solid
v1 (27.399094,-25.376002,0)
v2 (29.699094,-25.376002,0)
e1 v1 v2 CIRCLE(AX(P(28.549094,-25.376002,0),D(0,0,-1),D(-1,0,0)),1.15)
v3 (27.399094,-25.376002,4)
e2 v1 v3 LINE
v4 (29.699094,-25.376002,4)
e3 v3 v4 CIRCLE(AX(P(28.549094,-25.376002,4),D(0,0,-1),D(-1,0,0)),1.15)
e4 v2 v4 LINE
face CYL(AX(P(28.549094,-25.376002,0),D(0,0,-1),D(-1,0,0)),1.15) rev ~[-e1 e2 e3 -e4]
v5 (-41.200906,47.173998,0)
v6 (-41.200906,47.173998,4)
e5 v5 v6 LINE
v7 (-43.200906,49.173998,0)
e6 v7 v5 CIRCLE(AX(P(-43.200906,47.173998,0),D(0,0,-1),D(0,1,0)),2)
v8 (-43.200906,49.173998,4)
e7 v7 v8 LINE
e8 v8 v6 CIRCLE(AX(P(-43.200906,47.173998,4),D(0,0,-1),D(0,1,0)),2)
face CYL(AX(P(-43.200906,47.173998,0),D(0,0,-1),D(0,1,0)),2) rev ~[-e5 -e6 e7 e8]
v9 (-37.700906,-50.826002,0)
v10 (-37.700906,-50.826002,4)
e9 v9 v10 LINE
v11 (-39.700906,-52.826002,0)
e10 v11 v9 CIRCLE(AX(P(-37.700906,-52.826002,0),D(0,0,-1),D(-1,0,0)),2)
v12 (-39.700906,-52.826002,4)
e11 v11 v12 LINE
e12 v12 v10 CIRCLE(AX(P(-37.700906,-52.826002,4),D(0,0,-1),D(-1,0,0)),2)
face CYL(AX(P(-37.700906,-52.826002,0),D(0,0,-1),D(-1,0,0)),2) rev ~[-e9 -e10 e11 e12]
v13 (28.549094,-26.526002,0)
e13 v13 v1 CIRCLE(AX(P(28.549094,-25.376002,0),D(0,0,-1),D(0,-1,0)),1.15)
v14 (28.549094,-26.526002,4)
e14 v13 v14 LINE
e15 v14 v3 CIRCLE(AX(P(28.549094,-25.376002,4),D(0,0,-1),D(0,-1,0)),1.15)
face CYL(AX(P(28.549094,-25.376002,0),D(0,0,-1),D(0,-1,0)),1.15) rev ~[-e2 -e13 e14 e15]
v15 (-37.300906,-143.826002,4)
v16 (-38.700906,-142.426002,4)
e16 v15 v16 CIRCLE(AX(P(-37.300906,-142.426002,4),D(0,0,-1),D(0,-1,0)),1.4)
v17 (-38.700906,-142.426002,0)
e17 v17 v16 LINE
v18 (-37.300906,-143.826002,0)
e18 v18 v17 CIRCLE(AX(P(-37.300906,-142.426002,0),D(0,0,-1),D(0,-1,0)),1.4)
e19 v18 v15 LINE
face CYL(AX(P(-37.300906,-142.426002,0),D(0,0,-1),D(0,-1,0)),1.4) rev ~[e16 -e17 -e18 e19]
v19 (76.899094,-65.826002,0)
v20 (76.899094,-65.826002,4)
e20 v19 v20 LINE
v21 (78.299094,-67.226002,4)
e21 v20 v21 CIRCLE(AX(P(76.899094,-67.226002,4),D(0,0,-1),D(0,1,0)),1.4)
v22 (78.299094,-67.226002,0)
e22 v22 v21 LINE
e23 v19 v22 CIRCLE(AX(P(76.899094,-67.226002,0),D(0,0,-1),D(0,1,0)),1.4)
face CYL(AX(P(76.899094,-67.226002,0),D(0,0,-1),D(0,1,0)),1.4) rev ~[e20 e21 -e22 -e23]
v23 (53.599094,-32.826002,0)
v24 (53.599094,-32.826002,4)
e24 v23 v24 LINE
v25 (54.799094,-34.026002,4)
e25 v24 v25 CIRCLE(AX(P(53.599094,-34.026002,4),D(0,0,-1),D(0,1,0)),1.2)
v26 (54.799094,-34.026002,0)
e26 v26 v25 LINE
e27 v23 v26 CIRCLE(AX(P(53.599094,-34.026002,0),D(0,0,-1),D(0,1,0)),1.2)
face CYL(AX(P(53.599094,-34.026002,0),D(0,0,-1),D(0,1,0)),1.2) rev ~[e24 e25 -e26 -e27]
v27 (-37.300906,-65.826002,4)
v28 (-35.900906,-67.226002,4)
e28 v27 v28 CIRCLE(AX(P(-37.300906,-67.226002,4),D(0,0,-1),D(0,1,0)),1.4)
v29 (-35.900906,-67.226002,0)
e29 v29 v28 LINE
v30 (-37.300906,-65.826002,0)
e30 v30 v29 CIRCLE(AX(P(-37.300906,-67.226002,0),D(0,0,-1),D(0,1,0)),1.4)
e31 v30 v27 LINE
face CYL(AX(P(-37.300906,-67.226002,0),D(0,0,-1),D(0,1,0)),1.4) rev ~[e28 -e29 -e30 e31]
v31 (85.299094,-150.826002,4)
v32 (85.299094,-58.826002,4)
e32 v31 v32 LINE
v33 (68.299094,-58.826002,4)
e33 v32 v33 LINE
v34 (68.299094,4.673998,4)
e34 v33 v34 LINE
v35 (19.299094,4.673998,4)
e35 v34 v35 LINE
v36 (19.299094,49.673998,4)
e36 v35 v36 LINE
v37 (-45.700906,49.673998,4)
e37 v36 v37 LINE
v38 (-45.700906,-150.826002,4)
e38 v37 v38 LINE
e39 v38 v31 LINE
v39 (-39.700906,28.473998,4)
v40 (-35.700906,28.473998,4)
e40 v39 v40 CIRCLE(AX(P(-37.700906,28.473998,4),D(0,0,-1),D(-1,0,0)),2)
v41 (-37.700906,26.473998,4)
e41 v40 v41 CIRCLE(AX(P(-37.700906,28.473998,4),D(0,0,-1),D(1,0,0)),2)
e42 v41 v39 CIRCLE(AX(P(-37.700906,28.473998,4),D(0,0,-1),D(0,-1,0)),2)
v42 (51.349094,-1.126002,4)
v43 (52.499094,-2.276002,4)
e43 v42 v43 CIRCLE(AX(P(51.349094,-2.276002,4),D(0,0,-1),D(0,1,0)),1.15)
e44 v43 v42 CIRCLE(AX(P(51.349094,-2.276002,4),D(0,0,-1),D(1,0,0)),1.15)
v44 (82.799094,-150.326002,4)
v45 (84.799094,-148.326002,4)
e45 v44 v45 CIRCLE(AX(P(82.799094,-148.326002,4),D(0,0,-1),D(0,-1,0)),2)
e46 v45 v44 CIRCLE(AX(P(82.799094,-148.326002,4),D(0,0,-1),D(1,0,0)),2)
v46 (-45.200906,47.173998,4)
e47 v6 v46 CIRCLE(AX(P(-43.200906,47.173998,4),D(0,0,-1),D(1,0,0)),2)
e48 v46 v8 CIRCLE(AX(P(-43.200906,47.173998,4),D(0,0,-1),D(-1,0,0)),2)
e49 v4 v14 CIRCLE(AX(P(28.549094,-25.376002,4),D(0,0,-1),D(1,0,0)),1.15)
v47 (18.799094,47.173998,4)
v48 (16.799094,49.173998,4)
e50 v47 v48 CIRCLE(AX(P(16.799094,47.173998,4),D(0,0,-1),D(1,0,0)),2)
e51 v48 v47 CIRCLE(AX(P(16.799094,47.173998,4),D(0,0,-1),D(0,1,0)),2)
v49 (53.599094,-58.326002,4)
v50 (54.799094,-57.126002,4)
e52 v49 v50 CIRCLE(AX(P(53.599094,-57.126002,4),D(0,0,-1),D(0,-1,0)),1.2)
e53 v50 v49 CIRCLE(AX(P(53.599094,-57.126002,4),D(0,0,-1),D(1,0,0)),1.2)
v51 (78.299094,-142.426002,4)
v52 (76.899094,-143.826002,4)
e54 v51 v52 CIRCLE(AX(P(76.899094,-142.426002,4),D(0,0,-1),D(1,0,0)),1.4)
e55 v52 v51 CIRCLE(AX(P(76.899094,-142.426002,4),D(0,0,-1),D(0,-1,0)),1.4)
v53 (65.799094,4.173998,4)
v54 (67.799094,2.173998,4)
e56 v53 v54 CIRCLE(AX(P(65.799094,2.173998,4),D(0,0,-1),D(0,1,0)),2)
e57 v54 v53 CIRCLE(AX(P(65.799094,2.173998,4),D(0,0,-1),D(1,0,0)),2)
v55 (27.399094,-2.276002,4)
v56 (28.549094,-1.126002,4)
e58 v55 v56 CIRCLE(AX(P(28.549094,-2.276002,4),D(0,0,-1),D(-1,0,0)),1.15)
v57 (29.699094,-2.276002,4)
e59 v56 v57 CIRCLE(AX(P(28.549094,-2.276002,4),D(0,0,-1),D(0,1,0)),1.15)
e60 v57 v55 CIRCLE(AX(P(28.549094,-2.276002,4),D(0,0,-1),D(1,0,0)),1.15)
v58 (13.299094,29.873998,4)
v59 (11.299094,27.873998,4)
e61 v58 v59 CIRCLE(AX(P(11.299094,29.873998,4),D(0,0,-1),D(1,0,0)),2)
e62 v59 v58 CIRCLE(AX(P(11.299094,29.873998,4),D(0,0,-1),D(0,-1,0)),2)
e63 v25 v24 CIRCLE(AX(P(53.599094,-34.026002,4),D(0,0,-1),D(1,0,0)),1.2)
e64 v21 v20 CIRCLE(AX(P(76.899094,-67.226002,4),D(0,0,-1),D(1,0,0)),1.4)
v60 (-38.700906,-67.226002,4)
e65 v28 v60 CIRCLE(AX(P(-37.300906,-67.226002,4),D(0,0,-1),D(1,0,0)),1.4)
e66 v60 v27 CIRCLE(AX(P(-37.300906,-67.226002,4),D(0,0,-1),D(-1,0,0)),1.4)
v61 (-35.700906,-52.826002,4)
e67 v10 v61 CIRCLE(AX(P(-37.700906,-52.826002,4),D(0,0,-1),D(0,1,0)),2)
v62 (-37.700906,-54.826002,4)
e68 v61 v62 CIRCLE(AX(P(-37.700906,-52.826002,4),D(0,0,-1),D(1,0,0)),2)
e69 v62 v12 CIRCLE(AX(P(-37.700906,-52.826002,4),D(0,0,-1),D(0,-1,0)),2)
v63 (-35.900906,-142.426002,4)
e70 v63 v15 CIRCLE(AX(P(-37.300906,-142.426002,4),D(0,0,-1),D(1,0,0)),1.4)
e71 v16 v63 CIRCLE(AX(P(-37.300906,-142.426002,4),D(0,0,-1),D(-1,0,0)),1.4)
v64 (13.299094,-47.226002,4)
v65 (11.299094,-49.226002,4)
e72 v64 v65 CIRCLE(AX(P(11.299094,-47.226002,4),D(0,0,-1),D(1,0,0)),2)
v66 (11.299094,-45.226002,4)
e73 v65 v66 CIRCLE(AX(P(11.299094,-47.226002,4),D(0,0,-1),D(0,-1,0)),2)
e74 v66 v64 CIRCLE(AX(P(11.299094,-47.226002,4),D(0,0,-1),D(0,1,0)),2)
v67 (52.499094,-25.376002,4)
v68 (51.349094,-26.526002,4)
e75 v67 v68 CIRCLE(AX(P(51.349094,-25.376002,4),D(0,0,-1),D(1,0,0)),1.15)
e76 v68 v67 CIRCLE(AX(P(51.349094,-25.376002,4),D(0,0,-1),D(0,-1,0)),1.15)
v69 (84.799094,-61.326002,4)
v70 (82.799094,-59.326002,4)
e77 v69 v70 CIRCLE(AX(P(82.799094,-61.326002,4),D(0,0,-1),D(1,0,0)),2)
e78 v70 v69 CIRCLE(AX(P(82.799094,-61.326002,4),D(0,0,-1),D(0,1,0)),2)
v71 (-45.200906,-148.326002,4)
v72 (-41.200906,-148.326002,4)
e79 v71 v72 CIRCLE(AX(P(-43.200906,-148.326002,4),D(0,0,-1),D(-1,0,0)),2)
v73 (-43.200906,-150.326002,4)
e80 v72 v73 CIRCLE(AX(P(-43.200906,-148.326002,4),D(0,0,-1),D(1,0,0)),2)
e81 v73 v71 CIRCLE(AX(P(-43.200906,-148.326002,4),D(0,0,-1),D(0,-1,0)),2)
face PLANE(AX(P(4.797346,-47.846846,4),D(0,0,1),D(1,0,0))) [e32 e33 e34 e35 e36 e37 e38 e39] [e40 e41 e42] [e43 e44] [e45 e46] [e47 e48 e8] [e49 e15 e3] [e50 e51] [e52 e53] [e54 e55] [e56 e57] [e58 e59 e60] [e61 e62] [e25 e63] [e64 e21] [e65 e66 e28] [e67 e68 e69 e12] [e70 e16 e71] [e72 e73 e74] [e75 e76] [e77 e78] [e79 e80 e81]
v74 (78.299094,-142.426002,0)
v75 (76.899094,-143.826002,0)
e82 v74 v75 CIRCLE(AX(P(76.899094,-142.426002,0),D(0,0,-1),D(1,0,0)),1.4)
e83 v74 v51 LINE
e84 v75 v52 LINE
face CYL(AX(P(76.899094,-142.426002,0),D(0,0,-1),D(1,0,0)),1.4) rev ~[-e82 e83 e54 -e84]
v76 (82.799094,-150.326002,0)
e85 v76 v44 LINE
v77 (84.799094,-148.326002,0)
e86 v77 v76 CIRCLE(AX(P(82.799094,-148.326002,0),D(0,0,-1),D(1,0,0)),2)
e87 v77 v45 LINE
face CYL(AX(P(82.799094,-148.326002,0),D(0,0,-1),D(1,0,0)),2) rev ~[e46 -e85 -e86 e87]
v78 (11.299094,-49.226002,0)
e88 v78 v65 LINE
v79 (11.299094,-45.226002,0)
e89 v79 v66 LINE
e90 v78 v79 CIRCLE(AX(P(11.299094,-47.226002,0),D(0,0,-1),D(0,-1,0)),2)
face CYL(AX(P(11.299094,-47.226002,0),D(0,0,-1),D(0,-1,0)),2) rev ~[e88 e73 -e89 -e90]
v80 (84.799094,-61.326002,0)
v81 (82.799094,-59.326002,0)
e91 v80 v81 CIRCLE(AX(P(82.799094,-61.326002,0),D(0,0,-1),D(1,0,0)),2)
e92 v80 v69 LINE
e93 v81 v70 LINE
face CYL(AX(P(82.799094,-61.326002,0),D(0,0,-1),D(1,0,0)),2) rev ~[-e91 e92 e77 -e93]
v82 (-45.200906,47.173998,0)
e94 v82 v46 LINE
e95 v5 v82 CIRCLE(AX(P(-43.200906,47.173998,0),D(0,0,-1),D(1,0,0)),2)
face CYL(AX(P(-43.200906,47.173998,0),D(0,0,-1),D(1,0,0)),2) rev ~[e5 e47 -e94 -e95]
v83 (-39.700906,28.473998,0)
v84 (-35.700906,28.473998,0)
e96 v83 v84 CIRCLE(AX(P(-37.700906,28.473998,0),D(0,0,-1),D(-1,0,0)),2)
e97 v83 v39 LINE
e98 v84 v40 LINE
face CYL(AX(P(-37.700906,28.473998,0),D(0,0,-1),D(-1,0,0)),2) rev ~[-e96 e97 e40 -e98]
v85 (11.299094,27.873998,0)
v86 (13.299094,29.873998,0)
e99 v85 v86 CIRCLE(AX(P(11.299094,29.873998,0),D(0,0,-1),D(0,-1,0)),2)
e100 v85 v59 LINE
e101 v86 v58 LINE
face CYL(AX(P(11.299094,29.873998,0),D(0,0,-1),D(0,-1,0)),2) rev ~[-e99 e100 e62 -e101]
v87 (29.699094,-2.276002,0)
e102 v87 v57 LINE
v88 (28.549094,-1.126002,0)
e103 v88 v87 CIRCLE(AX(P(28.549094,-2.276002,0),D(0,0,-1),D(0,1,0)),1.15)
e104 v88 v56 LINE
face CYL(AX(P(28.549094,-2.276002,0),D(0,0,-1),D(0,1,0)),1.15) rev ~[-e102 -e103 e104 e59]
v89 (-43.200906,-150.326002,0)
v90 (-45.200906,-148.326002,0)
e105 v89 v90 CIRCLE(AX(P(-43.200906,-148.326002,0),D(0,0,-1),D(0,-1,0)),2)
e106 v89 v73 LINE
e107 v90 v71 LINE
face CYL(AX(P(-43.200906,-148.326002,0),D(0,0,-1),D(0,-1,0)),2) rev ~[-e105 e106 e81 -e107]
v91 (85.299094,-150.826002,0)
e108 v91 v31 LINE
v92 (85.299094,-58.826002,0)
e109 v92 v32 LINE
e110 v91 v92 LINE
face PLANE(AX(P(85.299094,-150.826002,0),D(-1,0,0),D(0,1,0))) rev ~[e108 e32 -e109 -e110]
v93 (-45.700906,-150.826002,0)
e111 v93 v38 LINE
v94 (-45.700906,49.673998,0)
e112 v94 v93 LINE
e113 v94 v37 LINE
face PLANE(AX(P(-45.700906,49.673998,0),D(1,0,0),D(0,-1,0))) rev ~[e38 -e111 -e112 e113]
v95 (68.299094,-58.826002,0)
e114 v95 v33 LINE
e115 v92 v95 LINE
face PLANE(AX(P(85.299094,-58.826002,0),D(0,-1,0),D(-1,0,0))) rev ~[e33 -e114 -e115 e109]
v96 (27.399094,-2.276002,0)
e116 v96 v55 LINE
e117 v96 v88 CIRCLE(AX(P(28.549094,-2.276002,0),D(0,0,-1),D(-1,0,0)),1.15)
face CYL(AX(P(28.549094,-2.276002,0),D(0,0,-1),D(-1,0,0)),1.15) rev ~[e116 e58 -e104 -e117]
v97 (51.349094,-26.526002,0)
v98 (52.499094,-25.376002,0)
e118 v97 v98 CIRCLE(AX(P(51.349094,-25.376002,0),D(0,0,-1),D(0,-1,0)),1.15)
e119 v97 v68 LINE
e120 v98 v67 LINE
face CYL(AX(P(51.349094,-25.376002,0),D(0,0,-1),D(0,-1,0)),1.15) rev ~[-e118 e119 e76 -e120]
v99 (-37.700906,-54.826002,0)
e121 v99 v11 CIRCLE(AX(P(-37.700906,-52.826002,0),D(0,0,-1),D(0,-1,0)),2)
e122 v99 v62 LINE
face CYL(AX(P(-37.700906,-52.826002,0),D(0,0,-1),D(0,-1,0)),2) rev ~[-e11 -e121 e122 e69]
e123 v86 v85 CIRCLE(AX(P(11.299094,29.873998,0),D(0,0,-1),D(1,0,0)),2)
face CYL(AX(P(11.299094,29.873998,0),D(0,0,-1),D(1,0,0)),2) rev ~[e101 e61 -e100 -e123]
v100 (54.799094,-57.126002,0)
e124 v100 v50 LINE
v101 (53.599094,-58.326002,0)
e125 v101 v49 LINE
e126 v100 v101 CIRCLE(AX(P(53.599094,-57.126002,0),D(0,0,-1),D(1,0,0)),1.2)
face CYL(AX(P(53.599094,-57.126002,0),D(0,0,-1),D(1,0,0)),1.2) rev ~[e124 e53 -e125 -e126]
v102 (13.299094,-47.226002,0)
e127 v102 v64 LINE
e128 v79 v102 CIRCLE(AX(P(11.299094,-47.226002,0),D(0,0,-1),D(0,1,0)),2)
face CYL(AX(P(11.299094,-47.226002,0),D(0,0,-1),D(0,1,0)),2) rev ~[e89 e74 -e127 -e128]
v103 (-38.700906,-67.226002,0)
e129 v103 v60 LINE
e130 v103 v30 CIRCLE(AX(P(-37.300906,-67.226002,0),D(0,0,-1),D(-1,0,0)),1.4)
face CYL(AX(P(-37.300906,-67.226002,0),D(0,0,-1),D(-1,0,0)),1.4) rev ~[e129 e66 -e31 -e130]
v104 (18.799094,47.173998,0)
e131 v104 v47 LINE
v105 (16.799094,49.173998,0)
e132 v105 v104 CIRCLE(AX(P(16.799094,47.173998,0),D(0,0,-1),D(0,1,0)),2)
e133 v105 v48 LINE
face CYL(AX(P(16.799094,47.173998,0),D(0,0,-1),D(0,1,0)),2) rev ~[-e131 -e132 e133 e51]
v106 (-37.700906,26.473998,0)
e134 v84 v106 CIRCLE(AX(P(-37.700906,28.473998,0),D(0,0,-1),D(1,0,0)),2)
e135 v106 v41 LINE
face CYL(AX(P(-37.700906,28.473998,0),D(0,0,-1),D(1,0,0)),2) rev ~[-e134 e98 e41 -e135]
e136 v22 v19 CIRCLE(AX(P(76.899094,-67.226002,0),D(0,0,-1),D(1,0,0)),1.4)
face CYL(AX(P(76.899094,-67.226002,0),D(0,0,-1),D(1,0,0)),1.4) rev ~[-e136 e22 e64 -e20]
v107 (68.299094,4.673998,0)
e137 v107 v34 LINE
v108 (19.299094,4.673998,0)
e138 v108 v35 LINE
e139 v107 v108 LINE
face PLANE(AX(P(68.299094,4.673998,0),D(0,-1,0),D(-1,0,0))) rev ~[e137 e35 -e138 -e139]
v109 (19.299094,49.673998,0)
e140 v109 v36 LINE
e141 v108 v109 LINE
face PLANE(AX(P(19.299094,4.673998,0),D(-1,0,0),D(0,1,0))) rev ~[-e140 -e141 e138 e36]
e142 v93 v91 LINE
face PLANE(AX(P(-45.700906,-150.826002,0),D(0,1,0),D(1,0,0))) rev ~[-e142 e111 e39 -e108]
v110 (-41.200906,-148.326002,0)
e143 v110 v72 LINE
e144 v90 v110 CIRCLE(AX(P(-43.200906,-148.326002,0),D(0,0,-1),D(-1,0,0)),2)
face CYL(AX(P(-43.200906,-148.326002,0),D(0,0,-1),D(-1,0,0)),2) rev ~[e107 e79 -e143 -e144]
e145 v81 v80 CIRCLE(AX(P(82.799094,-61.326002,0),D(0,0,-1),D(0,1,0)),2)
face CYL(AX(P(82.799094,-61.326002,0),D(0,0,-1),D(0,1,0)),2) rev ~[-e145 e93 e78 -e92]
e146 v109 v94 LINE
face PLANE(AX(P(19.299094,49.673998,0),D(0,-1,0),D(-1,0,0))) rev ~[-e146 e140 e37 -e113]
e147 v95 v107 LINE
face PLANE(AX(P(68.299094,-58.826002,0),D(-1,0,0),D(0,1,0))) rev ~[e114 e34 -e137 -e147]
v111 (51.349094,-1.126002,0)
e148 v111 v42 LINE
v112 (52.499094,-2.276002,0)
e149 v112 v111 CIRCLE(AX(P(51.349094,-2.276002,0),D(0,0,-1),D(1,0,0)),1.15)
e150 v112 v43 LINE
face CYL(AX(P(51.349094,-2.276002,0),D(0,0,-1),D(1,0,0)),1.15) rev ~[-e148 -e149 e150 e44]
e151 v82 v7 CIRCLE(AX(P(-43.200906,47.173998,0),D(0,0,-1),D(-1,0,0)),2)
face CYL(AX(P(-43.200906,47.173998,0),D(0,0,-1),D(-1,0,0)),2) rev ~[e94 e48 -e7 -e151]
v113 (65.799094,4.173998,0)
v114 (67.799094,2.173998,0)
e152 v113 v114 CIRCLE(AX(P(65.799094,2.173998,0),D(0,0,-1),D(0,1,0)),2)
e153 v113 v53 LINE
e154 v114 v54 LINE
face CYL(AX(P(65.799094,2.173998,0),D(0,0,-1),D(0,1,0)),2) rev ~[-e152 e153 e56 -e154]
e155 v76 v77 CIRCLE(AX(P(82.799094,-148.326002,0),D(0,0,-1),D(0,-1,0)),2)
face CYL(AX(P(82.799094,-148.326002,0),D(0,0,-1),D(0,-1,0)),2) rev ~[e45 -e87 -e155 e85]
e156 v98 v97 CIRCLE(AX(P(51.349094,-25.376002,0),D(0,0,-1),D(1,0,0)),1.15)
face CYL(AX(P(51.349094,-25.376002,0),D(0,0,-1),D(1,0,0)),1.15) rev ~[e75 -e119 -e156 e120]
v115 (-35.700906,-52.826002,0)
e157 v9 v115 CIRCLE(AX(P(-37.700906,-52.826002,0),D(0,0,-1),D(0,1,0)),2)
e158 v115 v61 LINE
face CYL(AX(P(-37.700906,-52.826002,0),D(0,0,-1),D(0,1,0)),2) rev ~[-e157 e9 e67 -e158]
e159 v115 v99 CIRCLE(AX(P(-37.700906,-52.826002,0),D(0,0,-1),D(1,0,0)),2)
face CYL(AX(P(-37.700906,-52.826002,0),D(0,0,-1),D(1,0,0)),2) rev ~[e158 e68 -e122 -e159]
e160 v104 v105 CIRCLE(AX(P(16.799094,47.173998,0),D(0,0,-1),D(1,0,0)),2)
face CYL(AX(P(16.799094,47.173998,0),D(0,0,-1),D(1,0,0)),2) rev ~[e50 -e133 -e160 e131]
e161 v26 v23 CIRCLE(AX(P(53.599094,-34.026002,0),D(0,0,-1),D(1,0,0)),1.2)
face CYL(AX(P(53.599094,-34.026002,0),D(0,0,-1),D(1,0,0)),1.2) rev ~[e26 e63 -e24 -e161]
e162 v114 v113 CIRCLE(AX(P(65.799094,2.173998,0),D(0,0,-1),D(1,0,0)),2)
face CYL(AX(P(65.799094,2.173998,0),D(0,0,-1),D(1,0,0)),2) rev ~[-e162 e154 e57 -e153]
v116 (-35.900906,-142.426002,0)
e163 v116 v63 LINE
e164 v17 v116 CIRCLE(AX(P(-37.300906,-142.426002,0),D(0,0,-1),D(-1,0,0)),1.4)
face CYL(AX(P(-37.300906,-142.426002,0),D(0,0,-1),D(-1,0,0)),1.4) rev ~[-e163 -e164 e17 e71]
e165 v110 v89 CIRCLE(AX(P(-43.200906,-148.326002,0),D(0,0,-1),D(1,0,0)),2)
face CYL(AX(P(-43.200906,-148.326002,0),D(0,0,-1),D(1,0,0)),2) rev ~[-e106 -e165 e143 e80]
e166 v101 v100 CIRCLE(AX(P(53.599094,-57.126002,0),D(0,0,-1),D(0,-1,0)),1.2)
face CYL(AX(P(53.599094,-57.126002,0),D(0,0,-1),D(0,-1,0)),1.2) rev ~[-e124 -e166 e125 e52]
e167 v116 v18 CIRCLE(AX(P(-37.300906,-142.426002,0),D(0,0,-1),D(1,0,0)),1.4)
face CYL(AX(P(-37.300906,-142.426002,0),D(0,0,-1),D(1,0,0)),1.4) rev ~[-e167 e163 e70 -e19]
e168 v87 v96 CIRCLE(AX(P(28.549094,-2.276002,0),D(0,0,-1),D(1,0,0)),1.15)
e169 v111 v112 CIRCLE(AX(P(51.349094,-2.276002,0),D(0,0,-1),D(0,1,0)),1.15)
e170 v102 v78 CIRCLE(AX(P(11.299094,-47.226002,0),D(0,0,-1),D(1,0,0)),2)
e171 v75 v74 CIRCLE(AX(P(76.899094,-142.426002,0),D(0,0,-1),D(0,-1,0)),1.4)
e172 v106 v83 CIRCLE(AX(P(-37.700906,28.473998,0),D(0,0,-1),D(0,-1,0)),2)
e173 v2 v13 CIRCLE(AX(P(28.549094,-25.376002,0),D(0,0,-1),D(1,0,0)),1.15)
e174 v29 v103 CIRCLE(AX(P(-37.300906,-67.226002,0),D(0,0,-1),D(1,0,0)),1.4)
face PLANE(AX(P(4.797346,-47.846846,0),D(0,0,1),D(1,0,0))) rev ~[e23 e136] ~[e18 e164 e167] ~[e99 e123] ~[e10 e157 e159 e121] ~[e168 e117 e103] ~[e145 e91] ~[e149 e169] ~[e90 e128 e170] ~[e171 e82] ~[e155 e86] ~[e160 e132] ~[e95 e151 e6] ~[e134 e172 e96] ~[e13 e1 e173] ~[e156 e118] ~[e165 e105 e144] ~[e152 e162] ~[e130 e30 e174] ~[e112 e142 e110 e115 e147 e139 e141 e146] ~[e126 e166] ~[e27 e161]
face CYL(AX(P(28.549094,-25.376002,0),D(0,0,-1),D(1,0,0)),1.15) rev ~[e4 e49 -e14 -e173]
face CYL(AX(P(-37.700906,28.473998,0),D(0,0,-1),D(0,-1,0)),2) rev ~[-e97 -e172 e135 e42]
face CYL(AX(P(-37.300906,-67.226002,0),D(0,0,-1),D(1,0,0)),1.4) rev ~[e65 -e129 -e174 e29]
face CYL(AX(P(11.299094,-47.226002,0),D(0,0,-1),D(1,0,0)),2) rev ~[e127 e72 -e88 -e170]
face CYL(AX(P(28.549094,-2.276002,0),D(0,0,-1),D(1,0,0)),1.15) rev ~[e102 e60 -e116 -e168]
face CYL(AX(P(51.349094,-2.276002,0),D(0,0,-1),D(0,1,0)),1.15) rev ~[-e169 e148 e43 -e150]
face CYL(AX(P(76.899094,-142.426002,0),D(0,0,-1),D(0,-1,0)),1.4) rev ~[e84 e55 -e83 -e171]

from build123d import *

# Parameters (mm, degrees)
F0_W     = 10
F0_H     = 17
F0_W_2   = 5
F0_H_2   = 5
F1_DEPTH = 4


with BuildPart() as f1:
    # F0 (on Top) → F1 (new body)
    with BuildSketch(Plane.XY):
        with BuildLine():
            Line((-37.7009056807, -58.8260023594), (-40.7009056807, -58.8260023594))
            Line((-40.7009056807, -58.8260023594), (-40.7009056807, -52.8260023594))
            Line((-40.7009056807, -52.8260023594), (-40.7009056807, 28.4739976406))
            Line((-40.7009056807, 28.4739976406), (-40.7009056807, 44.6739976406))
            Line((-40.7009056807, 44.6739976406), (14.2990943193, 44.6739976406))
            Line((14.2990943193, 44.6739976406), (14.2990943193, 49.6739976406))
            Line((14.2990943193, 49.6739976406), (-43.2009056807, 49.6739976406))
            Line((-43.2009056807, 49.6739976406), (-43.2009056807, 49.1739976406))
            ThreePointArc((-43.2009056807, 49.1739976406), (-41.7866921183, 48.588211203), (-41.2009056807, 47.1739976406))
            ThreePointArc((-41.2009056807, 47.1739976406), (-43.2009056807, 45.1739976406), (-45.2009056807, 47.1739976406))
            Line((-45.2009056807, 47.1739976406), (-45.7009056807, 47.1739976406))
            Line((-45.7009056807, 47.1739976406), (-45.7009056807, -148.3260023594))
            Line((-45.7009056807, -148.3260023594), (-45.2009056807, -148.3260023594))
            ThreePointArc((-45.2009056807, -148.3260023594), (-43.2009056807, -146.3260023594), (-41.2009056807, -148.3260023594))
            ThreePointArc((-41.2009056807, -148.3260023594), (-41.7866921183, -149.7402159218), (-43.2009056807, -150.3260023594))
            Line((-43.2009056807, -150.3260023594), (-43.2009056807, -150.8260023594))
            Line((-43.2009056807, -150.8260023594), (82.7990943193, -150.8260023594))
            Line((82.7990943193, -150.8260023594), (82.7990943193, -150.3260023594))
            ThreePointArc((82.7990943193, -150.3260023594), (81.384880757, -146.911788797), (84.7990943193, -148.3260023594))
            Line((84.7990943193, -148.3260023594), (85.2990943193, -148.3260023594))
            Line((85.2990943193, -148.3260023594), (85.2990943193, -63.8260023594))
            Line((85.2990943193, -63.8260023594), (80.2990943193, -63.8260023594))
            Line((80.2990943193, -63.8260023594), (80.2990943193, -58.8260023594))
            Line((80.2990943193, -58.8260023594), (68.2990943193, -58.8260023594))
            Line((68.2990943193, -58.8260023594), (68.2990943193, -22.3260023594))
            Line((68.2990943193, -22.3260023594), (68.2990943193, -5.3260023594))
            Line((68.2990943193, -5.3260023594), (63.2990943193, -5.3260023594))
            Line((63.2990943193, -5.3260023594), (63.2990943193, -22.3260023594))
            Line((63.2990943193, -22.3260023594), (53.2990943193, -22.3260023594))
            Line((53.2990943193, -22.3260023594), (53.2990943193, -25.3760023594))
            Line((53.2990943193, -25.3760023594), (53.2990943193, -27.3260023594))
            Line((53.2990943193, -27.3260023594), (51.3490943193, -27.3260023594))
            Line((51.3490943193, -27.3260023594), (28.5490943193, -27.3260023594))
            Line((28.5490943193, -27.3260023594), (19.2990943193, -27.3260023594))
            Line((19.2990943193, -27.3260023594), (19.2990943193, -25.3760023594))
            Line((19.2990943193, -25.3760023594), (19.2990943193, -2.2760023594))
            Line((19.2990943193, -2.2760023594), (19.2990943193, -0.3260023594))
            Line((19.2990943193, -0.3260023594), (14.2990943193, -0.3260023594))
            Line((14.2990943193, -0.3260023594), (14.2990943193, -27.3260023594))
            Line((14.2990943193, -27.3260023594), (14.2990943193, -32.3260023594))
            Line((14.2990943193, -32.3260023594), (14.2990943193, -47.2260023594))
            Line((14.2990943193, -47.2260023594), (14.2990943193, -58.8260023594))
            Line((14.2990943193, -58.8260023594), (11.2990943193, -58.8260023594))
            Line((11.2990943193, -58.8260023594), (-37.7009056807, -58.8260023594))
        make_face()
        Polygon((76.8990943193, -63.8260023594), (80.2990943193, -63.8260023594), (80.2990943193, -67.2260023594), (80.2990943193, -142.4260023594), (80.2990943193, -145.8260023594), (76.8990943193, -145.8260023594), (-37.3009056807, -145.8260023594), (-40.7009056807, -145.8260023594), (-40.7009056807, -142.4260023594), (-40.7009056807, -67.2260023594), (-40.7009056807, -63.8260023594), (-37.3009056807, -63.8260023594), (14.2990943193, -63.8260023594), (19.2990943193, -63.8260023594), align=None, mode=Mode.SUBTRACT)
        Polygon((53.5990943193, -58.8260023594), (19.2990943193, -58.8260023594), (19.2990943193, -32.3260023594), (53.5990943193, -32.3260023594), (55.2990943193, -32.3260023594), (55.2990943193, -34.0260023594), (55.2990943193, -57.1260023594), (55.2990943193, -58.8260023594), align=None, mode=Mode.SUBTRACT)
        with BuildLine():
            Line((76.8990943193, -65.8260023594), (76.8990943193, -63.8260023594))
            Line((76.8990943193, -63.8260023594), (19.2990943193, -63.8260023594))
            Line((19.2990943193, -63.8260023594), (14.2990943193, -63.8260023594))
            Line((14.2990943193, -63.8260023594), (-37.3009056807, -63.8260023594))
            Line((-37.3009056807, -63.8260023594), (-37.3009056807, -65.8260023594))
            ThreePointArc((-37.3009056807, -65.8260023594), (-36.310956187, -66.2360528657), (-35.9009056807, -67.2260023594))
            ThreePointArc((-35.9009056807, -67.2260023594), (-37.3009056807, -68.6260023594), (-38.7009056807, -67.2260023594))
            Line((-38.7009056807, -67.2260023594), (-40.7009056807, -67.2260023594))
            Line((-40.7009056807, -67.2260023594), (-40.7009056807, -142.4260023594))
            Line((-40.7009056807, -142.4260023594), (-38.7009056807, -142.4260023594))
            ThreePointArc((-38.7009056807, -142.4260023594), (-37.3009056807, -141.0260023594), (-35.9009056807, -142.4260023594))
            ThreePointArc((-35.9009056807, -142.4260023594), (-36.310956187, -143.4159518531), (-37.3009056807, -143.8260023594))
            Line((-37.3009056807, -143.8260023594), (-37.3009056807, -145.8260023594))
            Line((-37.3009056807, -145.8260023594), (76.8990943193, -145.8260023594))
            Line((76.8990943193, -145.8260023594), (76.8990943193, -143.8260023594))
            ThreePointArc((76.8990943193, -143.8260023594), (75.9091448257, -141.4360528657), (78.2990943193, -142.4260023594))
            Line((78.2990943193, -142.4260023594), (80.2990943193, -142.4260023594))
            Line((80.2990943193, -142.4260023594), (80.2990943193, -67.2260023594))
            Line((80.2990943193, -67.2260023594), (78.2990943193, -67.2260023594))
            ThreePointArc((78.2990943193, -67.2260023594), (75.9091448257, -68.2159518531), (76.8990943193, -65.8260023594))
        make_face()
        with BuildLine():
            Line((-37.7009056807, -54.8260023594), (-37.7009056807, -58.8260023594))
            Line((-37.7009056807, -58.8260023594), (11.2990943193, -58.8260023594))
            Line((11.2990943193, -58.8260023594), (11.2990943193, -49.2260023594))
            ThreePointArc((11.2990943193, -49.2260023594), (9.2990943193, -47.2260023594), (11.2990943193, -45.2260023594))
            Line((11.2990943193, -45.2260023594), (11.2990943193, 27.8739976406))
            ThreePointArc((11.2990943193, 27.8739976406), (9.884880757, 31.288211203), (13.2990943193, 29.8739976406))
            Line((13.2990943193, 29.8739976406), (14.2990943193, 29.8739976406))
            Line((14.2990943193, 29.8739976406), (14.2990943193, 44.6739976406))
            Line((14.2990943193, 44.6739976406), (-40.7009056807, 44.6739976406))
            Line((-40.7009056807, 44.6739976406), (-40.7009056807, 28.4739976406))
            Line((-40.7009056807, 28.4739976406), (-39.7009056807, 28.4739976406))
            ThreePointArc((-39.7009056807, 28.4739976406), (-37.7009056807, 30.4739976406), (-35.7009056807, 28.4739976406))
            ThreePointArc((-35.7009056807, 28.4739976406), (-36.2866921183, 27.0597840782), (-37.7009056807, 26.4739976406))
            Line((-37.7009056807, 26.4739976406), (-37.7009056807, -50.8260023594))
            ThreePointArc((-37.7009056807, -50.8260023594), (-36.2866921183, -51.411788797), (-35.7009056807, -52.8260023594))
            ThreePointArc((-35.7009056807, -52.8260023594), (-36.2866921183, -54.2402159218), (-37.7009056807, -54.8260023594))
        make_face()
        with BuildLine():
            Line((19.2990943193, -32.3260023594), (19.2990943193, -58.8260023594))
            Line((19.2990943193, -58.8260023594), (53.5990943193, -58.8260023594))
            Line((53.5990943193, -58.8260023594), (53.5990943193, -58.3260023594))
            ThreePointArc((53.5990943193, -58.3260023594), (52.7505661819, -56.277474222), (54.7990943193, -57.1260023594))
            Line((54.7990943193, -57.1260023594), (55.2990943193, -57.1260023594))
            Line((55.2990943193, -57.1260023594), (55.2990943193, -34.0260023594))
            Line((55.2990943193, -34.0260023594), (54.7990943193, -34.0260023594))
            ThreePointArc((54.7990943193, -34.0260023594), (52.7505661819, -34.8745304968), (53.5990943193, -32.8260023594))
            Line((53.5990943193, -32.8260023594), (53.5990943193, -32.3260023594))
            Line((53.5990943193, -32.3260023594), (19.2990943193, -32.3260023594))
        make_face()
        with BuildLine():
            Line((51.3490943193, -0.3260023594), (28.5490943193, -0.3260023594))
            Line((28.5490943193, -0.3260023594), (28.5490943193, -1.1260023594))
            ThreePointArc((28.5490943193, -1.1260023594), (29.3622671177, -1.462829561), (29.6990943193, -2.2760023594))
            ThreePointArc((29.6990943193, -2.2760023594), (28.5490943193, -3.4260023594), (27.3990943193, -2.2760023594))
            Line((27.3990943193, -2.2760023594), (19.2990943193, -2.2760023594))
            Line((19.2990943193, -2.2760023594), (19.2990943193, -25.3760023594))
            Line((19.2990943193, -25.3760023594), (27.3990943193, -25.3760023594))
            ThreePointArc((27.3990943193, -25.3760023594), (28.5490943193, -24.2260023594), (29.6990943193, -25.3760023594))
            ThreePointArc((29.6990943193, -25.3760023594), (29.3622671177, -26.1891751578), (28.5490943193, -26.5260023594))
            Line((28.5490943193, -26.5260023594), (28.5490943193, -27.3260023594))
            Line((28.5490943193, -27.3260023594), (51.3490943193, -27.3260023594))
            Line((51.3490943193, -27.3260023594), (51.3490943193, -26.5260023594))
            ThreePointArc((51.3490943193, -26.5260023594), (50.535921521, -24.562829561), (52.4990943193, -25.3760023594))
            Line((52.4990943193, -25.3760023594), (53.2990943193, -25.3760023594))
            Line((53.2990943193, -25.3760023594), (53.2990943193, -22.3260023594))
            Line((53.2990943193, -22.3260023594), (53.2990943193, -5.3260023594))
            Line((53.2990943193, -5.3260023594), (53.2990943193, -2.2760023594))
            Line((53.2990943193, -2.2760023594), (52.4990943193, -2.2760023594))
            ThreePointArc((52.4990943193, -2.2760023594), (50.535921521, -3.0891751578), (51.3490943193, -1.1260023594))
            Line((51.3490943193, -1.1260023594), (51.3490943193, -0.3260023594))
        make_face()
        with BuildLine():
            Line((65.7990943193, 4.6739976406), (19.2990943193, 4.6739976406))
            Line((19.2990943193, 4.6739976406), (19.2990943193, -0.3260023594))
            Line((19.2990943193, -0.3260023594), (28.5490943193, -0.3260023594))
            Line((28.5490943193, -0.3260023594), (51.3490943193, -0.3260023594))
            Line((51.3490943193, -0.3260023594), (53.2990943193, -0.3260023594))
            Line((53.2990943193, -0.3260023594), (53.2990943193, -2.2760023594))
            Line((53.2990943193, -2.2760023594), (53.2990943193, -5.3260023594))
            Line((53.2990943193, -5.3260023594), (63.2990943193, -5.3260023594))
            Line((63.2990943193, -5.3260023594), (68.2990943193, -5.3260023594))
            Line((68.2990943193, -5.3260023594), (68.2990943193, 2.1739976406))
            Line((68.2990943193, 2.1739976406), (67.7990943193, 2.1739976406))
            ThreePointArc((67.7990943193, 2.1739976406), (64.384880757, 0.7597840782), (65.7990943193, 4.1739976406))
            Line((65.7990943193, 4.1739976406), (65.7990943193, 4.6739976406))
        make_face()
        with BuildLine():
            Line((-40.7009056807, 28.4739976406), (-40.7009056807, -52.8260023594))
            Line((-40.7009056807, -52.8260023594), (-39.7009056807, -52.8260023594))
            ThreePointArc((-39.7009056807, -52.8260023594), (-39.115119243, -51.411788797), (-37.7009056807, -50.8260023594))
            Line((-37.7009056807, -50.8260023594), (-37.7009056807, 26.4739976406))
            ThreePointArc((-37.7009056807, 26.4739976406), (-39.115119243, 27.0597840782), (-39.7009056807, 28.4739976406))
            Line((-39.7009056807, 28.4739976406), (-40.7009056807, 28.4739976406))
        make_face()
        with BuildLine():
            Line((13.2990943193, -47.2260023594), (14.2990943193, -47.2260023594))
            Line((14.2990943193, -47.2260023594), (14.2990943193, -32.3260023594))
            Line((14.2990943193, -32.3260023594), (14.2990943193, -27.3260023594))
            Line((14.2990943193, -27.3260023594), (14.2990943193, -0.3260023594))
            Line((14.2990943193, -0.3260023594), (14.2990943193, 4.6739976406))
            Line((14.2990943193, 4.6739976406), (14.2990943193, 29.8739976406))
            Line((14.2990943193, 29.8739976406), (13.2990943193, 29.8739976406))
            ThreePointArc((13.2990943193, 29.8739976406), (12.7133078817, 28.4597840782), (11.2990943193, 27.8739976406))
            Line((11.2990943193, 27.8739976406), (11.2990943193, -45.2260023594))
            ThreePointArc((11.2990943193, -45.2260023594), (12.7133078817, -45.811788797), (13.2990943193, -47.2260023594))
        make_face()
        Polygon((16.7990943193, 44.6739976406), (14.2990943193, 44.6739976406), (14.2990943193, 29.8739976406), (14.2990943193, 4.6739976406), (19.2990943193, 4.6739976406), (19.2990943193, 44.6739976406), align=None)
        with Locations((58.2990943193, -13.8260023594)):
            Rectangle(F0_W, F0_H)
        with BuildLine():
            Line((11.2990943193, -49.2260023594), (11.2990943193, -58.8260023594))
            Line((11.2990943193, -58.8260023594), (14.2990943193, -58.8260023594))
            Line((14.2990943193, -58.8260023594), (14.2990943193, -47.2260023594))
            Line((14.2990943193, -47.2260023594), (13.2990943193, -47.2260023594))
            ThreePointArc((13.2990943193, -47.2260023594), (12.7133078817, -48.6402159218), (11.2990943193, -49.2260023594))
        make_face()
        with Locations((16.7990943193, 2.1739976406)):
            Rectangle(F0_W_2, F0_H_2)
        with BuildLine():
            Line((28.5490943193, -0.3260023594), (19.2990943193, -0.3260023594))
            Line((19.2990943193, -0.3260023594), (19.2990943193, -2.2760023594))
            Line((19.2990943193, -2.2760023594), (27.3990943193, -2.2760023594))
            ThreePointArc((27.3990943193, -2.2760023594), (27.735921521, -1.462829561), (28.5490943193, -1.1260023594))
            Line((28.5490943193, -1.1260023594), (28.5490943193, -0.3260023594))
        make_face()
        with BuildLine():
            Line((27.3990943193, -25.3760023594), (19.2990943193, -25.3760023594))
            Line((19.2990943193, -25.3760023594), (19.2990943193, -27.3260023594))
            Line((19.2990943193, -27.3260023594), (28.5490943193, -27.3260023594))
            Line((28.5490943193, -27.3260023594), (28.5490943193, -26.5260023594))
            ThreePointArc((28.5490943193, -26.5260023594), (27.735921521, -26.1891751578), (27.3990943193, -25.3760023594))
        make_face()
        with BuildLine():
            Line((-40.7009056807, -52.8260023594), (-40.7009056807, -58.8260023594))
            Line((-40.7009056807, -58.8260023594), (-37.7009056807, -58.8260023594))
            Line((-37.7009056807, -58.8260023594), (-37.7009056807, -54.8260023594))
            ThreePointArc((-37.7009056807, -54.8260023594), (-39.115119243, -54.2402159218), (-39.7009056807, -52.8260023594))
            Line((-39.7009056807, -52.8260023594), (-40.7009056807, -52.8260023594))
        make_face()
        with BuildLine():
            Line((80.2990943193, -67.2260023594), (80.2990943193, -63.8260023594))
            Line((80.2990943193, -63.8260023594), (76.8990943193, -63.8260023594))
            Line((76.8990943193, -63.8260023594), (76.8990943193, -65.8260023594))
            ThreePointArc((76.8990943193, -65.8260023594), (77.889043813, -66.2360528657), (78.2990943193, -67.2260023594))
            Line((78.2990943193, -67.2260023594), (80.2990943193, -67.2260023594))
        make_face()
        with BuildLine():
            Line((80.2990943193, -145.8260023594), (80.2990943193, -142.4260023594))
            Line((80.2990943193, -142.4260023594), (78.2990943193, -142.4260023594))
            ThreePointArc((78.2990943193, -142.4260023594), (77.889043813, -143.4159518531), (76.8990943193, -143.8260023594))
            Line((76.8990943193, -143.8260023594), (76.8990943193, -145.8260023594))
            Line((76.8990943193, -145.8260023594), (80.2990943193, -145.8260023594))
        make_face()
        with BuildLine():
            Line((-37.3009056807, -65.8260023594), (-37.3009056807, -63.8260023594))
            Line((-37.3009056807, -63.8260023594), (-40.7009056807, -63.8260023594))
            Line((-40.7009056807, -63.8260023594), (-40.7009056807, -67.2260023594))
            Line((-40.7009056807, -67.2260023594), (-38.7009056807, -67.2260023594))
            ThreePointArc((-38.7009056807, -67.2260023594), (-38.2908551743, -66.2360528657), (-37.3009056807, -65.8260023594))
        make_face()
        with BuildLine():
            Line((-40.7009056807, -145.8260023594), (-37.3009056807, -145.8260023594))
            Line((-37.3009056807, -145.8260023594), (-37.3009056807, -143.8260023594))
            ThreePointArc((-37.3009056807, -143.8260023594), (-38.2908551743, -143.4159518531), (-38.7009056807, -142.4260023594))
            Line((-38.7009056807, -142.4260023594), (-40.7009056807, -142.4260023594))
            Line((-40.7009056807, -142.4260023594), (-40.7009056807, -145.8260023594))
        make_face()
        with BuildLine():
            Line((14.2990943193, 49.6739976406), (14.2990943193, 44.6739976406))
            Line((14.2990943193, 44.6739976406), (16.7990943193, 44.6739976406))
            Line((16.7990943193, 44.6739976406), (19.2990943193, 44.6739976406))
            Line((19.2990943193, 44.6739976406), (19.2990943193, 47.1739976406))
            Line((19.2990943193, 47.1739976406), (18.7990943193, 47.1739976406))
            ThreePointArc((18.7990943193, 47.1739976406), (15.384880757, 45.7597840782), (16.7990943193, 49.1739976406))
            Line((16.7990943193, 49.1739976406), (16.7990943193, 49.6739976406))
            Line((16.7990943193, 49.6739976406), (14.2990943193, 49.6739976406))
        make_face()
        with BuildLine():
            Line((85.2990943193, -63.8260023594), (85.2990943193, -61.3260023594))
            Line((85.2990943193, -61.3260023594), (84.7990943193, -61.3260023594))
            ThreePointArc((84.7990943193, -61.3260023594), (81.384880757, -62.7402159218), (82.7990943193, -59.3260023594))
            Line((82.7990943193, -59.3260023594), (82.7990943193, -58.8260023594))
            Line((82.7990943193, -58.8260023594), (80.2990943193, -58.8260023594))
            Line((80.2990943193, -58.8260023594), (80.2990943193, -63.8260023594))
            Line((80.2990943193, -63.8260023594), (85.2990943193, -63.8260023594))
        make_face()
        with BuildLine():
            Line((-43.2009056807, 49.1739976406), (-43.2009056807, 49.6739976406))
            Line((-43.2009056807, 49.6739976406), (-45.7009056807, 49.6739976406))
            Line((-45.7009056807, 49.6739976406), (-45.7009056807, 47.1739976406))
            Line((-45.7009056807, 47.1739976406), (-45.2009056807, 47.1739976406))
            ThreePointArc((-45.2009056807, 47.1739976406), (-44.615119243, 48.588211203), (-43.2009056807, 49.1739976406))
        make_face()
        with BuildLine():
            Line((19.2990943193, 49.6739976406), (16.7990943193, 49.6739976406))
            Line((16.7990943193, 49.6739976406), (16.7990943193, 49.1739976406))
            ThreePointArc((16.7990943193, 49.1739976406), (18.2133078817, 48.588211203), (18.7990943193, 47.1739976406))
            Line((18.7990943193, 47.1739976406), (19.2990943193, 47.1739976406))
            Line((19.2990943193, 47.1739976406), (19.2990943193, 49.6739976406))
        make_face()
        with BuildLine():
            Line((68.2990943193, 4.6739976406), (65.7990943193, 4.6739976406))
            Line((65.7990943193, 4.6739976406), (65.7990943193, 4.1739976406))
            ThreePointArc((65.7990943193, 4.1739976406), (67.2133078817, 3.588211203), (67.7990943193, 2.1739976406))
            Line((67.7990943193, 2.1739976406), (68.2990943193, 2.1739976406))
            Line((68.2990943193, 2.1739976406), (68.2990943193, 4.6739976406))
        make_face()
        with BuildLine():
            Line((-45.2009056807, -148.3260023594), (-45.7009056807, -148.3260023594))
            Line((-45.7009056807, -148.3260023594), (-45.7009056807, -150.8260023594))
            Line((-45.7009056807, -150.8260023594), (-43.2009056807, -150.8260023594))
            Line((-43.2009056807, -150.8260023594), (-43.2009056807, -150.3260023594))
            ThreePointArc((-43.2009056807, -150.3260023594), (-44.615119243, -149.7402159218), (-45.2009056807, -148.3260023594))
        make_face()
        with BuildLine():
            Line((82.7990943193, -150.3260023594), (82.7990943193, -150.8260023594))
            Line((82.7990943193, -150.8260023594), (85.2990943193, -150.8260023594))
            Line((85.2990943193, -150.8260023594), (85.2990943193, -148.3260023594))
            Line((85.2990943193, -148.3260023594), (84.7990943193, -148.3260023594))
            ThreePointArc((84.7990943193, -148.3260023594), (84.2133078817, -149.7402159218), (82.7990943193, -150.3260023594))
        make_face()
        with BuildLine():
            Line((85.2990943193, -61.3260023594), (85.2990943193, -58.8260023594))
            Line((85.2990943193, -58.8260023594), (82.7990943193, -58.8260023594))
            Line((82.7990943193, -58.8260023594), (82.7990943193, -59.3260023594))
            ThreePointArc((82.7990943193, -59.3260023594), (84.2133078817, -59.911788797), (84.7990943193, -61.3260023594))
            Line((84.7990943193, -61.3260023594), (85.2990943193, -61.3260023594))
        make_face()
        with BuildLine():
            Line((53.2990943193, -0.3260023594), (51.3490943193, -0.3260023594))
            Line((51.3490943193, -0.3260023594), (51.3490943193, -1.1260023594))
            ThreePointArc((51.3490943193, -1.1260023594), (52.1622671177, -1.462829561), (52.4990943193, -2.2760023594))
            Line((52.4990943193, -2.2760023594), (53.2990943193, -2.2760023594))
            Line((53.2990943193, -2.2760023594), (53.2990943193, -0.3260023594))
        make_face()
        with BuildLine():
            Line((51.3490943193, -26.5260023594), (51.3490943193, -27.3260023594))
            Line((51.3490943193, -27.3260023594), (53.2990943193, -27.3260023594))
            Line((53.2990943193, -27.3260023594), (53.2990943193, -25.3760023594))
            Line((53.2990943193, -25.3760023594), (52.4990943193, -25.3760023594))
            ThreePointArc((52.4990943193, -25.3760023594), (52.1622671177, -26.1891751578), (51.3490943193, -26.5260023594))
        make_face()
        with BuildLine():
            Line((53.5990943193, -58.3260023594), (53.5990943193, -58.8260023594))
            Line((53.5990943193, -58.8260023594), (55.2990943193, -58.8260023594))
            Line((55.2990943193, -58.8260023594), (55.2990943193, -57.1260023594))
            Line((55.2990943193, -57.1260023594), (54.7990943193, -57.1260023594))
            ThreePointArc((54.7990943193, -57.1260023594), (54.4476224568, -57.9745304968), (53.5990943193, -58.3260023594))
        make_face()
        with BuildLine():
            Line((55.2990943193, -32.3260023594), (53.5990943193, -32.3260023594))
            Line((53.5990943193, -32.3260023594), (53.5990943193, -32.8260023594))
            ThreePointArc((53.5990943193, -32.8260023594), (54.4476224568, -33.177474222), (54.7990943193, -34.0260023594))
            Line((54.7990943193, -34.0260023594), (55.2990943193, -34.0260023594))
            Line((55.2990943193, -34.0260023594), (55.2990943193, -32.3260023594))
        make_face()
    extrude(amount=F1_DEPTH)


solid = f1.part
